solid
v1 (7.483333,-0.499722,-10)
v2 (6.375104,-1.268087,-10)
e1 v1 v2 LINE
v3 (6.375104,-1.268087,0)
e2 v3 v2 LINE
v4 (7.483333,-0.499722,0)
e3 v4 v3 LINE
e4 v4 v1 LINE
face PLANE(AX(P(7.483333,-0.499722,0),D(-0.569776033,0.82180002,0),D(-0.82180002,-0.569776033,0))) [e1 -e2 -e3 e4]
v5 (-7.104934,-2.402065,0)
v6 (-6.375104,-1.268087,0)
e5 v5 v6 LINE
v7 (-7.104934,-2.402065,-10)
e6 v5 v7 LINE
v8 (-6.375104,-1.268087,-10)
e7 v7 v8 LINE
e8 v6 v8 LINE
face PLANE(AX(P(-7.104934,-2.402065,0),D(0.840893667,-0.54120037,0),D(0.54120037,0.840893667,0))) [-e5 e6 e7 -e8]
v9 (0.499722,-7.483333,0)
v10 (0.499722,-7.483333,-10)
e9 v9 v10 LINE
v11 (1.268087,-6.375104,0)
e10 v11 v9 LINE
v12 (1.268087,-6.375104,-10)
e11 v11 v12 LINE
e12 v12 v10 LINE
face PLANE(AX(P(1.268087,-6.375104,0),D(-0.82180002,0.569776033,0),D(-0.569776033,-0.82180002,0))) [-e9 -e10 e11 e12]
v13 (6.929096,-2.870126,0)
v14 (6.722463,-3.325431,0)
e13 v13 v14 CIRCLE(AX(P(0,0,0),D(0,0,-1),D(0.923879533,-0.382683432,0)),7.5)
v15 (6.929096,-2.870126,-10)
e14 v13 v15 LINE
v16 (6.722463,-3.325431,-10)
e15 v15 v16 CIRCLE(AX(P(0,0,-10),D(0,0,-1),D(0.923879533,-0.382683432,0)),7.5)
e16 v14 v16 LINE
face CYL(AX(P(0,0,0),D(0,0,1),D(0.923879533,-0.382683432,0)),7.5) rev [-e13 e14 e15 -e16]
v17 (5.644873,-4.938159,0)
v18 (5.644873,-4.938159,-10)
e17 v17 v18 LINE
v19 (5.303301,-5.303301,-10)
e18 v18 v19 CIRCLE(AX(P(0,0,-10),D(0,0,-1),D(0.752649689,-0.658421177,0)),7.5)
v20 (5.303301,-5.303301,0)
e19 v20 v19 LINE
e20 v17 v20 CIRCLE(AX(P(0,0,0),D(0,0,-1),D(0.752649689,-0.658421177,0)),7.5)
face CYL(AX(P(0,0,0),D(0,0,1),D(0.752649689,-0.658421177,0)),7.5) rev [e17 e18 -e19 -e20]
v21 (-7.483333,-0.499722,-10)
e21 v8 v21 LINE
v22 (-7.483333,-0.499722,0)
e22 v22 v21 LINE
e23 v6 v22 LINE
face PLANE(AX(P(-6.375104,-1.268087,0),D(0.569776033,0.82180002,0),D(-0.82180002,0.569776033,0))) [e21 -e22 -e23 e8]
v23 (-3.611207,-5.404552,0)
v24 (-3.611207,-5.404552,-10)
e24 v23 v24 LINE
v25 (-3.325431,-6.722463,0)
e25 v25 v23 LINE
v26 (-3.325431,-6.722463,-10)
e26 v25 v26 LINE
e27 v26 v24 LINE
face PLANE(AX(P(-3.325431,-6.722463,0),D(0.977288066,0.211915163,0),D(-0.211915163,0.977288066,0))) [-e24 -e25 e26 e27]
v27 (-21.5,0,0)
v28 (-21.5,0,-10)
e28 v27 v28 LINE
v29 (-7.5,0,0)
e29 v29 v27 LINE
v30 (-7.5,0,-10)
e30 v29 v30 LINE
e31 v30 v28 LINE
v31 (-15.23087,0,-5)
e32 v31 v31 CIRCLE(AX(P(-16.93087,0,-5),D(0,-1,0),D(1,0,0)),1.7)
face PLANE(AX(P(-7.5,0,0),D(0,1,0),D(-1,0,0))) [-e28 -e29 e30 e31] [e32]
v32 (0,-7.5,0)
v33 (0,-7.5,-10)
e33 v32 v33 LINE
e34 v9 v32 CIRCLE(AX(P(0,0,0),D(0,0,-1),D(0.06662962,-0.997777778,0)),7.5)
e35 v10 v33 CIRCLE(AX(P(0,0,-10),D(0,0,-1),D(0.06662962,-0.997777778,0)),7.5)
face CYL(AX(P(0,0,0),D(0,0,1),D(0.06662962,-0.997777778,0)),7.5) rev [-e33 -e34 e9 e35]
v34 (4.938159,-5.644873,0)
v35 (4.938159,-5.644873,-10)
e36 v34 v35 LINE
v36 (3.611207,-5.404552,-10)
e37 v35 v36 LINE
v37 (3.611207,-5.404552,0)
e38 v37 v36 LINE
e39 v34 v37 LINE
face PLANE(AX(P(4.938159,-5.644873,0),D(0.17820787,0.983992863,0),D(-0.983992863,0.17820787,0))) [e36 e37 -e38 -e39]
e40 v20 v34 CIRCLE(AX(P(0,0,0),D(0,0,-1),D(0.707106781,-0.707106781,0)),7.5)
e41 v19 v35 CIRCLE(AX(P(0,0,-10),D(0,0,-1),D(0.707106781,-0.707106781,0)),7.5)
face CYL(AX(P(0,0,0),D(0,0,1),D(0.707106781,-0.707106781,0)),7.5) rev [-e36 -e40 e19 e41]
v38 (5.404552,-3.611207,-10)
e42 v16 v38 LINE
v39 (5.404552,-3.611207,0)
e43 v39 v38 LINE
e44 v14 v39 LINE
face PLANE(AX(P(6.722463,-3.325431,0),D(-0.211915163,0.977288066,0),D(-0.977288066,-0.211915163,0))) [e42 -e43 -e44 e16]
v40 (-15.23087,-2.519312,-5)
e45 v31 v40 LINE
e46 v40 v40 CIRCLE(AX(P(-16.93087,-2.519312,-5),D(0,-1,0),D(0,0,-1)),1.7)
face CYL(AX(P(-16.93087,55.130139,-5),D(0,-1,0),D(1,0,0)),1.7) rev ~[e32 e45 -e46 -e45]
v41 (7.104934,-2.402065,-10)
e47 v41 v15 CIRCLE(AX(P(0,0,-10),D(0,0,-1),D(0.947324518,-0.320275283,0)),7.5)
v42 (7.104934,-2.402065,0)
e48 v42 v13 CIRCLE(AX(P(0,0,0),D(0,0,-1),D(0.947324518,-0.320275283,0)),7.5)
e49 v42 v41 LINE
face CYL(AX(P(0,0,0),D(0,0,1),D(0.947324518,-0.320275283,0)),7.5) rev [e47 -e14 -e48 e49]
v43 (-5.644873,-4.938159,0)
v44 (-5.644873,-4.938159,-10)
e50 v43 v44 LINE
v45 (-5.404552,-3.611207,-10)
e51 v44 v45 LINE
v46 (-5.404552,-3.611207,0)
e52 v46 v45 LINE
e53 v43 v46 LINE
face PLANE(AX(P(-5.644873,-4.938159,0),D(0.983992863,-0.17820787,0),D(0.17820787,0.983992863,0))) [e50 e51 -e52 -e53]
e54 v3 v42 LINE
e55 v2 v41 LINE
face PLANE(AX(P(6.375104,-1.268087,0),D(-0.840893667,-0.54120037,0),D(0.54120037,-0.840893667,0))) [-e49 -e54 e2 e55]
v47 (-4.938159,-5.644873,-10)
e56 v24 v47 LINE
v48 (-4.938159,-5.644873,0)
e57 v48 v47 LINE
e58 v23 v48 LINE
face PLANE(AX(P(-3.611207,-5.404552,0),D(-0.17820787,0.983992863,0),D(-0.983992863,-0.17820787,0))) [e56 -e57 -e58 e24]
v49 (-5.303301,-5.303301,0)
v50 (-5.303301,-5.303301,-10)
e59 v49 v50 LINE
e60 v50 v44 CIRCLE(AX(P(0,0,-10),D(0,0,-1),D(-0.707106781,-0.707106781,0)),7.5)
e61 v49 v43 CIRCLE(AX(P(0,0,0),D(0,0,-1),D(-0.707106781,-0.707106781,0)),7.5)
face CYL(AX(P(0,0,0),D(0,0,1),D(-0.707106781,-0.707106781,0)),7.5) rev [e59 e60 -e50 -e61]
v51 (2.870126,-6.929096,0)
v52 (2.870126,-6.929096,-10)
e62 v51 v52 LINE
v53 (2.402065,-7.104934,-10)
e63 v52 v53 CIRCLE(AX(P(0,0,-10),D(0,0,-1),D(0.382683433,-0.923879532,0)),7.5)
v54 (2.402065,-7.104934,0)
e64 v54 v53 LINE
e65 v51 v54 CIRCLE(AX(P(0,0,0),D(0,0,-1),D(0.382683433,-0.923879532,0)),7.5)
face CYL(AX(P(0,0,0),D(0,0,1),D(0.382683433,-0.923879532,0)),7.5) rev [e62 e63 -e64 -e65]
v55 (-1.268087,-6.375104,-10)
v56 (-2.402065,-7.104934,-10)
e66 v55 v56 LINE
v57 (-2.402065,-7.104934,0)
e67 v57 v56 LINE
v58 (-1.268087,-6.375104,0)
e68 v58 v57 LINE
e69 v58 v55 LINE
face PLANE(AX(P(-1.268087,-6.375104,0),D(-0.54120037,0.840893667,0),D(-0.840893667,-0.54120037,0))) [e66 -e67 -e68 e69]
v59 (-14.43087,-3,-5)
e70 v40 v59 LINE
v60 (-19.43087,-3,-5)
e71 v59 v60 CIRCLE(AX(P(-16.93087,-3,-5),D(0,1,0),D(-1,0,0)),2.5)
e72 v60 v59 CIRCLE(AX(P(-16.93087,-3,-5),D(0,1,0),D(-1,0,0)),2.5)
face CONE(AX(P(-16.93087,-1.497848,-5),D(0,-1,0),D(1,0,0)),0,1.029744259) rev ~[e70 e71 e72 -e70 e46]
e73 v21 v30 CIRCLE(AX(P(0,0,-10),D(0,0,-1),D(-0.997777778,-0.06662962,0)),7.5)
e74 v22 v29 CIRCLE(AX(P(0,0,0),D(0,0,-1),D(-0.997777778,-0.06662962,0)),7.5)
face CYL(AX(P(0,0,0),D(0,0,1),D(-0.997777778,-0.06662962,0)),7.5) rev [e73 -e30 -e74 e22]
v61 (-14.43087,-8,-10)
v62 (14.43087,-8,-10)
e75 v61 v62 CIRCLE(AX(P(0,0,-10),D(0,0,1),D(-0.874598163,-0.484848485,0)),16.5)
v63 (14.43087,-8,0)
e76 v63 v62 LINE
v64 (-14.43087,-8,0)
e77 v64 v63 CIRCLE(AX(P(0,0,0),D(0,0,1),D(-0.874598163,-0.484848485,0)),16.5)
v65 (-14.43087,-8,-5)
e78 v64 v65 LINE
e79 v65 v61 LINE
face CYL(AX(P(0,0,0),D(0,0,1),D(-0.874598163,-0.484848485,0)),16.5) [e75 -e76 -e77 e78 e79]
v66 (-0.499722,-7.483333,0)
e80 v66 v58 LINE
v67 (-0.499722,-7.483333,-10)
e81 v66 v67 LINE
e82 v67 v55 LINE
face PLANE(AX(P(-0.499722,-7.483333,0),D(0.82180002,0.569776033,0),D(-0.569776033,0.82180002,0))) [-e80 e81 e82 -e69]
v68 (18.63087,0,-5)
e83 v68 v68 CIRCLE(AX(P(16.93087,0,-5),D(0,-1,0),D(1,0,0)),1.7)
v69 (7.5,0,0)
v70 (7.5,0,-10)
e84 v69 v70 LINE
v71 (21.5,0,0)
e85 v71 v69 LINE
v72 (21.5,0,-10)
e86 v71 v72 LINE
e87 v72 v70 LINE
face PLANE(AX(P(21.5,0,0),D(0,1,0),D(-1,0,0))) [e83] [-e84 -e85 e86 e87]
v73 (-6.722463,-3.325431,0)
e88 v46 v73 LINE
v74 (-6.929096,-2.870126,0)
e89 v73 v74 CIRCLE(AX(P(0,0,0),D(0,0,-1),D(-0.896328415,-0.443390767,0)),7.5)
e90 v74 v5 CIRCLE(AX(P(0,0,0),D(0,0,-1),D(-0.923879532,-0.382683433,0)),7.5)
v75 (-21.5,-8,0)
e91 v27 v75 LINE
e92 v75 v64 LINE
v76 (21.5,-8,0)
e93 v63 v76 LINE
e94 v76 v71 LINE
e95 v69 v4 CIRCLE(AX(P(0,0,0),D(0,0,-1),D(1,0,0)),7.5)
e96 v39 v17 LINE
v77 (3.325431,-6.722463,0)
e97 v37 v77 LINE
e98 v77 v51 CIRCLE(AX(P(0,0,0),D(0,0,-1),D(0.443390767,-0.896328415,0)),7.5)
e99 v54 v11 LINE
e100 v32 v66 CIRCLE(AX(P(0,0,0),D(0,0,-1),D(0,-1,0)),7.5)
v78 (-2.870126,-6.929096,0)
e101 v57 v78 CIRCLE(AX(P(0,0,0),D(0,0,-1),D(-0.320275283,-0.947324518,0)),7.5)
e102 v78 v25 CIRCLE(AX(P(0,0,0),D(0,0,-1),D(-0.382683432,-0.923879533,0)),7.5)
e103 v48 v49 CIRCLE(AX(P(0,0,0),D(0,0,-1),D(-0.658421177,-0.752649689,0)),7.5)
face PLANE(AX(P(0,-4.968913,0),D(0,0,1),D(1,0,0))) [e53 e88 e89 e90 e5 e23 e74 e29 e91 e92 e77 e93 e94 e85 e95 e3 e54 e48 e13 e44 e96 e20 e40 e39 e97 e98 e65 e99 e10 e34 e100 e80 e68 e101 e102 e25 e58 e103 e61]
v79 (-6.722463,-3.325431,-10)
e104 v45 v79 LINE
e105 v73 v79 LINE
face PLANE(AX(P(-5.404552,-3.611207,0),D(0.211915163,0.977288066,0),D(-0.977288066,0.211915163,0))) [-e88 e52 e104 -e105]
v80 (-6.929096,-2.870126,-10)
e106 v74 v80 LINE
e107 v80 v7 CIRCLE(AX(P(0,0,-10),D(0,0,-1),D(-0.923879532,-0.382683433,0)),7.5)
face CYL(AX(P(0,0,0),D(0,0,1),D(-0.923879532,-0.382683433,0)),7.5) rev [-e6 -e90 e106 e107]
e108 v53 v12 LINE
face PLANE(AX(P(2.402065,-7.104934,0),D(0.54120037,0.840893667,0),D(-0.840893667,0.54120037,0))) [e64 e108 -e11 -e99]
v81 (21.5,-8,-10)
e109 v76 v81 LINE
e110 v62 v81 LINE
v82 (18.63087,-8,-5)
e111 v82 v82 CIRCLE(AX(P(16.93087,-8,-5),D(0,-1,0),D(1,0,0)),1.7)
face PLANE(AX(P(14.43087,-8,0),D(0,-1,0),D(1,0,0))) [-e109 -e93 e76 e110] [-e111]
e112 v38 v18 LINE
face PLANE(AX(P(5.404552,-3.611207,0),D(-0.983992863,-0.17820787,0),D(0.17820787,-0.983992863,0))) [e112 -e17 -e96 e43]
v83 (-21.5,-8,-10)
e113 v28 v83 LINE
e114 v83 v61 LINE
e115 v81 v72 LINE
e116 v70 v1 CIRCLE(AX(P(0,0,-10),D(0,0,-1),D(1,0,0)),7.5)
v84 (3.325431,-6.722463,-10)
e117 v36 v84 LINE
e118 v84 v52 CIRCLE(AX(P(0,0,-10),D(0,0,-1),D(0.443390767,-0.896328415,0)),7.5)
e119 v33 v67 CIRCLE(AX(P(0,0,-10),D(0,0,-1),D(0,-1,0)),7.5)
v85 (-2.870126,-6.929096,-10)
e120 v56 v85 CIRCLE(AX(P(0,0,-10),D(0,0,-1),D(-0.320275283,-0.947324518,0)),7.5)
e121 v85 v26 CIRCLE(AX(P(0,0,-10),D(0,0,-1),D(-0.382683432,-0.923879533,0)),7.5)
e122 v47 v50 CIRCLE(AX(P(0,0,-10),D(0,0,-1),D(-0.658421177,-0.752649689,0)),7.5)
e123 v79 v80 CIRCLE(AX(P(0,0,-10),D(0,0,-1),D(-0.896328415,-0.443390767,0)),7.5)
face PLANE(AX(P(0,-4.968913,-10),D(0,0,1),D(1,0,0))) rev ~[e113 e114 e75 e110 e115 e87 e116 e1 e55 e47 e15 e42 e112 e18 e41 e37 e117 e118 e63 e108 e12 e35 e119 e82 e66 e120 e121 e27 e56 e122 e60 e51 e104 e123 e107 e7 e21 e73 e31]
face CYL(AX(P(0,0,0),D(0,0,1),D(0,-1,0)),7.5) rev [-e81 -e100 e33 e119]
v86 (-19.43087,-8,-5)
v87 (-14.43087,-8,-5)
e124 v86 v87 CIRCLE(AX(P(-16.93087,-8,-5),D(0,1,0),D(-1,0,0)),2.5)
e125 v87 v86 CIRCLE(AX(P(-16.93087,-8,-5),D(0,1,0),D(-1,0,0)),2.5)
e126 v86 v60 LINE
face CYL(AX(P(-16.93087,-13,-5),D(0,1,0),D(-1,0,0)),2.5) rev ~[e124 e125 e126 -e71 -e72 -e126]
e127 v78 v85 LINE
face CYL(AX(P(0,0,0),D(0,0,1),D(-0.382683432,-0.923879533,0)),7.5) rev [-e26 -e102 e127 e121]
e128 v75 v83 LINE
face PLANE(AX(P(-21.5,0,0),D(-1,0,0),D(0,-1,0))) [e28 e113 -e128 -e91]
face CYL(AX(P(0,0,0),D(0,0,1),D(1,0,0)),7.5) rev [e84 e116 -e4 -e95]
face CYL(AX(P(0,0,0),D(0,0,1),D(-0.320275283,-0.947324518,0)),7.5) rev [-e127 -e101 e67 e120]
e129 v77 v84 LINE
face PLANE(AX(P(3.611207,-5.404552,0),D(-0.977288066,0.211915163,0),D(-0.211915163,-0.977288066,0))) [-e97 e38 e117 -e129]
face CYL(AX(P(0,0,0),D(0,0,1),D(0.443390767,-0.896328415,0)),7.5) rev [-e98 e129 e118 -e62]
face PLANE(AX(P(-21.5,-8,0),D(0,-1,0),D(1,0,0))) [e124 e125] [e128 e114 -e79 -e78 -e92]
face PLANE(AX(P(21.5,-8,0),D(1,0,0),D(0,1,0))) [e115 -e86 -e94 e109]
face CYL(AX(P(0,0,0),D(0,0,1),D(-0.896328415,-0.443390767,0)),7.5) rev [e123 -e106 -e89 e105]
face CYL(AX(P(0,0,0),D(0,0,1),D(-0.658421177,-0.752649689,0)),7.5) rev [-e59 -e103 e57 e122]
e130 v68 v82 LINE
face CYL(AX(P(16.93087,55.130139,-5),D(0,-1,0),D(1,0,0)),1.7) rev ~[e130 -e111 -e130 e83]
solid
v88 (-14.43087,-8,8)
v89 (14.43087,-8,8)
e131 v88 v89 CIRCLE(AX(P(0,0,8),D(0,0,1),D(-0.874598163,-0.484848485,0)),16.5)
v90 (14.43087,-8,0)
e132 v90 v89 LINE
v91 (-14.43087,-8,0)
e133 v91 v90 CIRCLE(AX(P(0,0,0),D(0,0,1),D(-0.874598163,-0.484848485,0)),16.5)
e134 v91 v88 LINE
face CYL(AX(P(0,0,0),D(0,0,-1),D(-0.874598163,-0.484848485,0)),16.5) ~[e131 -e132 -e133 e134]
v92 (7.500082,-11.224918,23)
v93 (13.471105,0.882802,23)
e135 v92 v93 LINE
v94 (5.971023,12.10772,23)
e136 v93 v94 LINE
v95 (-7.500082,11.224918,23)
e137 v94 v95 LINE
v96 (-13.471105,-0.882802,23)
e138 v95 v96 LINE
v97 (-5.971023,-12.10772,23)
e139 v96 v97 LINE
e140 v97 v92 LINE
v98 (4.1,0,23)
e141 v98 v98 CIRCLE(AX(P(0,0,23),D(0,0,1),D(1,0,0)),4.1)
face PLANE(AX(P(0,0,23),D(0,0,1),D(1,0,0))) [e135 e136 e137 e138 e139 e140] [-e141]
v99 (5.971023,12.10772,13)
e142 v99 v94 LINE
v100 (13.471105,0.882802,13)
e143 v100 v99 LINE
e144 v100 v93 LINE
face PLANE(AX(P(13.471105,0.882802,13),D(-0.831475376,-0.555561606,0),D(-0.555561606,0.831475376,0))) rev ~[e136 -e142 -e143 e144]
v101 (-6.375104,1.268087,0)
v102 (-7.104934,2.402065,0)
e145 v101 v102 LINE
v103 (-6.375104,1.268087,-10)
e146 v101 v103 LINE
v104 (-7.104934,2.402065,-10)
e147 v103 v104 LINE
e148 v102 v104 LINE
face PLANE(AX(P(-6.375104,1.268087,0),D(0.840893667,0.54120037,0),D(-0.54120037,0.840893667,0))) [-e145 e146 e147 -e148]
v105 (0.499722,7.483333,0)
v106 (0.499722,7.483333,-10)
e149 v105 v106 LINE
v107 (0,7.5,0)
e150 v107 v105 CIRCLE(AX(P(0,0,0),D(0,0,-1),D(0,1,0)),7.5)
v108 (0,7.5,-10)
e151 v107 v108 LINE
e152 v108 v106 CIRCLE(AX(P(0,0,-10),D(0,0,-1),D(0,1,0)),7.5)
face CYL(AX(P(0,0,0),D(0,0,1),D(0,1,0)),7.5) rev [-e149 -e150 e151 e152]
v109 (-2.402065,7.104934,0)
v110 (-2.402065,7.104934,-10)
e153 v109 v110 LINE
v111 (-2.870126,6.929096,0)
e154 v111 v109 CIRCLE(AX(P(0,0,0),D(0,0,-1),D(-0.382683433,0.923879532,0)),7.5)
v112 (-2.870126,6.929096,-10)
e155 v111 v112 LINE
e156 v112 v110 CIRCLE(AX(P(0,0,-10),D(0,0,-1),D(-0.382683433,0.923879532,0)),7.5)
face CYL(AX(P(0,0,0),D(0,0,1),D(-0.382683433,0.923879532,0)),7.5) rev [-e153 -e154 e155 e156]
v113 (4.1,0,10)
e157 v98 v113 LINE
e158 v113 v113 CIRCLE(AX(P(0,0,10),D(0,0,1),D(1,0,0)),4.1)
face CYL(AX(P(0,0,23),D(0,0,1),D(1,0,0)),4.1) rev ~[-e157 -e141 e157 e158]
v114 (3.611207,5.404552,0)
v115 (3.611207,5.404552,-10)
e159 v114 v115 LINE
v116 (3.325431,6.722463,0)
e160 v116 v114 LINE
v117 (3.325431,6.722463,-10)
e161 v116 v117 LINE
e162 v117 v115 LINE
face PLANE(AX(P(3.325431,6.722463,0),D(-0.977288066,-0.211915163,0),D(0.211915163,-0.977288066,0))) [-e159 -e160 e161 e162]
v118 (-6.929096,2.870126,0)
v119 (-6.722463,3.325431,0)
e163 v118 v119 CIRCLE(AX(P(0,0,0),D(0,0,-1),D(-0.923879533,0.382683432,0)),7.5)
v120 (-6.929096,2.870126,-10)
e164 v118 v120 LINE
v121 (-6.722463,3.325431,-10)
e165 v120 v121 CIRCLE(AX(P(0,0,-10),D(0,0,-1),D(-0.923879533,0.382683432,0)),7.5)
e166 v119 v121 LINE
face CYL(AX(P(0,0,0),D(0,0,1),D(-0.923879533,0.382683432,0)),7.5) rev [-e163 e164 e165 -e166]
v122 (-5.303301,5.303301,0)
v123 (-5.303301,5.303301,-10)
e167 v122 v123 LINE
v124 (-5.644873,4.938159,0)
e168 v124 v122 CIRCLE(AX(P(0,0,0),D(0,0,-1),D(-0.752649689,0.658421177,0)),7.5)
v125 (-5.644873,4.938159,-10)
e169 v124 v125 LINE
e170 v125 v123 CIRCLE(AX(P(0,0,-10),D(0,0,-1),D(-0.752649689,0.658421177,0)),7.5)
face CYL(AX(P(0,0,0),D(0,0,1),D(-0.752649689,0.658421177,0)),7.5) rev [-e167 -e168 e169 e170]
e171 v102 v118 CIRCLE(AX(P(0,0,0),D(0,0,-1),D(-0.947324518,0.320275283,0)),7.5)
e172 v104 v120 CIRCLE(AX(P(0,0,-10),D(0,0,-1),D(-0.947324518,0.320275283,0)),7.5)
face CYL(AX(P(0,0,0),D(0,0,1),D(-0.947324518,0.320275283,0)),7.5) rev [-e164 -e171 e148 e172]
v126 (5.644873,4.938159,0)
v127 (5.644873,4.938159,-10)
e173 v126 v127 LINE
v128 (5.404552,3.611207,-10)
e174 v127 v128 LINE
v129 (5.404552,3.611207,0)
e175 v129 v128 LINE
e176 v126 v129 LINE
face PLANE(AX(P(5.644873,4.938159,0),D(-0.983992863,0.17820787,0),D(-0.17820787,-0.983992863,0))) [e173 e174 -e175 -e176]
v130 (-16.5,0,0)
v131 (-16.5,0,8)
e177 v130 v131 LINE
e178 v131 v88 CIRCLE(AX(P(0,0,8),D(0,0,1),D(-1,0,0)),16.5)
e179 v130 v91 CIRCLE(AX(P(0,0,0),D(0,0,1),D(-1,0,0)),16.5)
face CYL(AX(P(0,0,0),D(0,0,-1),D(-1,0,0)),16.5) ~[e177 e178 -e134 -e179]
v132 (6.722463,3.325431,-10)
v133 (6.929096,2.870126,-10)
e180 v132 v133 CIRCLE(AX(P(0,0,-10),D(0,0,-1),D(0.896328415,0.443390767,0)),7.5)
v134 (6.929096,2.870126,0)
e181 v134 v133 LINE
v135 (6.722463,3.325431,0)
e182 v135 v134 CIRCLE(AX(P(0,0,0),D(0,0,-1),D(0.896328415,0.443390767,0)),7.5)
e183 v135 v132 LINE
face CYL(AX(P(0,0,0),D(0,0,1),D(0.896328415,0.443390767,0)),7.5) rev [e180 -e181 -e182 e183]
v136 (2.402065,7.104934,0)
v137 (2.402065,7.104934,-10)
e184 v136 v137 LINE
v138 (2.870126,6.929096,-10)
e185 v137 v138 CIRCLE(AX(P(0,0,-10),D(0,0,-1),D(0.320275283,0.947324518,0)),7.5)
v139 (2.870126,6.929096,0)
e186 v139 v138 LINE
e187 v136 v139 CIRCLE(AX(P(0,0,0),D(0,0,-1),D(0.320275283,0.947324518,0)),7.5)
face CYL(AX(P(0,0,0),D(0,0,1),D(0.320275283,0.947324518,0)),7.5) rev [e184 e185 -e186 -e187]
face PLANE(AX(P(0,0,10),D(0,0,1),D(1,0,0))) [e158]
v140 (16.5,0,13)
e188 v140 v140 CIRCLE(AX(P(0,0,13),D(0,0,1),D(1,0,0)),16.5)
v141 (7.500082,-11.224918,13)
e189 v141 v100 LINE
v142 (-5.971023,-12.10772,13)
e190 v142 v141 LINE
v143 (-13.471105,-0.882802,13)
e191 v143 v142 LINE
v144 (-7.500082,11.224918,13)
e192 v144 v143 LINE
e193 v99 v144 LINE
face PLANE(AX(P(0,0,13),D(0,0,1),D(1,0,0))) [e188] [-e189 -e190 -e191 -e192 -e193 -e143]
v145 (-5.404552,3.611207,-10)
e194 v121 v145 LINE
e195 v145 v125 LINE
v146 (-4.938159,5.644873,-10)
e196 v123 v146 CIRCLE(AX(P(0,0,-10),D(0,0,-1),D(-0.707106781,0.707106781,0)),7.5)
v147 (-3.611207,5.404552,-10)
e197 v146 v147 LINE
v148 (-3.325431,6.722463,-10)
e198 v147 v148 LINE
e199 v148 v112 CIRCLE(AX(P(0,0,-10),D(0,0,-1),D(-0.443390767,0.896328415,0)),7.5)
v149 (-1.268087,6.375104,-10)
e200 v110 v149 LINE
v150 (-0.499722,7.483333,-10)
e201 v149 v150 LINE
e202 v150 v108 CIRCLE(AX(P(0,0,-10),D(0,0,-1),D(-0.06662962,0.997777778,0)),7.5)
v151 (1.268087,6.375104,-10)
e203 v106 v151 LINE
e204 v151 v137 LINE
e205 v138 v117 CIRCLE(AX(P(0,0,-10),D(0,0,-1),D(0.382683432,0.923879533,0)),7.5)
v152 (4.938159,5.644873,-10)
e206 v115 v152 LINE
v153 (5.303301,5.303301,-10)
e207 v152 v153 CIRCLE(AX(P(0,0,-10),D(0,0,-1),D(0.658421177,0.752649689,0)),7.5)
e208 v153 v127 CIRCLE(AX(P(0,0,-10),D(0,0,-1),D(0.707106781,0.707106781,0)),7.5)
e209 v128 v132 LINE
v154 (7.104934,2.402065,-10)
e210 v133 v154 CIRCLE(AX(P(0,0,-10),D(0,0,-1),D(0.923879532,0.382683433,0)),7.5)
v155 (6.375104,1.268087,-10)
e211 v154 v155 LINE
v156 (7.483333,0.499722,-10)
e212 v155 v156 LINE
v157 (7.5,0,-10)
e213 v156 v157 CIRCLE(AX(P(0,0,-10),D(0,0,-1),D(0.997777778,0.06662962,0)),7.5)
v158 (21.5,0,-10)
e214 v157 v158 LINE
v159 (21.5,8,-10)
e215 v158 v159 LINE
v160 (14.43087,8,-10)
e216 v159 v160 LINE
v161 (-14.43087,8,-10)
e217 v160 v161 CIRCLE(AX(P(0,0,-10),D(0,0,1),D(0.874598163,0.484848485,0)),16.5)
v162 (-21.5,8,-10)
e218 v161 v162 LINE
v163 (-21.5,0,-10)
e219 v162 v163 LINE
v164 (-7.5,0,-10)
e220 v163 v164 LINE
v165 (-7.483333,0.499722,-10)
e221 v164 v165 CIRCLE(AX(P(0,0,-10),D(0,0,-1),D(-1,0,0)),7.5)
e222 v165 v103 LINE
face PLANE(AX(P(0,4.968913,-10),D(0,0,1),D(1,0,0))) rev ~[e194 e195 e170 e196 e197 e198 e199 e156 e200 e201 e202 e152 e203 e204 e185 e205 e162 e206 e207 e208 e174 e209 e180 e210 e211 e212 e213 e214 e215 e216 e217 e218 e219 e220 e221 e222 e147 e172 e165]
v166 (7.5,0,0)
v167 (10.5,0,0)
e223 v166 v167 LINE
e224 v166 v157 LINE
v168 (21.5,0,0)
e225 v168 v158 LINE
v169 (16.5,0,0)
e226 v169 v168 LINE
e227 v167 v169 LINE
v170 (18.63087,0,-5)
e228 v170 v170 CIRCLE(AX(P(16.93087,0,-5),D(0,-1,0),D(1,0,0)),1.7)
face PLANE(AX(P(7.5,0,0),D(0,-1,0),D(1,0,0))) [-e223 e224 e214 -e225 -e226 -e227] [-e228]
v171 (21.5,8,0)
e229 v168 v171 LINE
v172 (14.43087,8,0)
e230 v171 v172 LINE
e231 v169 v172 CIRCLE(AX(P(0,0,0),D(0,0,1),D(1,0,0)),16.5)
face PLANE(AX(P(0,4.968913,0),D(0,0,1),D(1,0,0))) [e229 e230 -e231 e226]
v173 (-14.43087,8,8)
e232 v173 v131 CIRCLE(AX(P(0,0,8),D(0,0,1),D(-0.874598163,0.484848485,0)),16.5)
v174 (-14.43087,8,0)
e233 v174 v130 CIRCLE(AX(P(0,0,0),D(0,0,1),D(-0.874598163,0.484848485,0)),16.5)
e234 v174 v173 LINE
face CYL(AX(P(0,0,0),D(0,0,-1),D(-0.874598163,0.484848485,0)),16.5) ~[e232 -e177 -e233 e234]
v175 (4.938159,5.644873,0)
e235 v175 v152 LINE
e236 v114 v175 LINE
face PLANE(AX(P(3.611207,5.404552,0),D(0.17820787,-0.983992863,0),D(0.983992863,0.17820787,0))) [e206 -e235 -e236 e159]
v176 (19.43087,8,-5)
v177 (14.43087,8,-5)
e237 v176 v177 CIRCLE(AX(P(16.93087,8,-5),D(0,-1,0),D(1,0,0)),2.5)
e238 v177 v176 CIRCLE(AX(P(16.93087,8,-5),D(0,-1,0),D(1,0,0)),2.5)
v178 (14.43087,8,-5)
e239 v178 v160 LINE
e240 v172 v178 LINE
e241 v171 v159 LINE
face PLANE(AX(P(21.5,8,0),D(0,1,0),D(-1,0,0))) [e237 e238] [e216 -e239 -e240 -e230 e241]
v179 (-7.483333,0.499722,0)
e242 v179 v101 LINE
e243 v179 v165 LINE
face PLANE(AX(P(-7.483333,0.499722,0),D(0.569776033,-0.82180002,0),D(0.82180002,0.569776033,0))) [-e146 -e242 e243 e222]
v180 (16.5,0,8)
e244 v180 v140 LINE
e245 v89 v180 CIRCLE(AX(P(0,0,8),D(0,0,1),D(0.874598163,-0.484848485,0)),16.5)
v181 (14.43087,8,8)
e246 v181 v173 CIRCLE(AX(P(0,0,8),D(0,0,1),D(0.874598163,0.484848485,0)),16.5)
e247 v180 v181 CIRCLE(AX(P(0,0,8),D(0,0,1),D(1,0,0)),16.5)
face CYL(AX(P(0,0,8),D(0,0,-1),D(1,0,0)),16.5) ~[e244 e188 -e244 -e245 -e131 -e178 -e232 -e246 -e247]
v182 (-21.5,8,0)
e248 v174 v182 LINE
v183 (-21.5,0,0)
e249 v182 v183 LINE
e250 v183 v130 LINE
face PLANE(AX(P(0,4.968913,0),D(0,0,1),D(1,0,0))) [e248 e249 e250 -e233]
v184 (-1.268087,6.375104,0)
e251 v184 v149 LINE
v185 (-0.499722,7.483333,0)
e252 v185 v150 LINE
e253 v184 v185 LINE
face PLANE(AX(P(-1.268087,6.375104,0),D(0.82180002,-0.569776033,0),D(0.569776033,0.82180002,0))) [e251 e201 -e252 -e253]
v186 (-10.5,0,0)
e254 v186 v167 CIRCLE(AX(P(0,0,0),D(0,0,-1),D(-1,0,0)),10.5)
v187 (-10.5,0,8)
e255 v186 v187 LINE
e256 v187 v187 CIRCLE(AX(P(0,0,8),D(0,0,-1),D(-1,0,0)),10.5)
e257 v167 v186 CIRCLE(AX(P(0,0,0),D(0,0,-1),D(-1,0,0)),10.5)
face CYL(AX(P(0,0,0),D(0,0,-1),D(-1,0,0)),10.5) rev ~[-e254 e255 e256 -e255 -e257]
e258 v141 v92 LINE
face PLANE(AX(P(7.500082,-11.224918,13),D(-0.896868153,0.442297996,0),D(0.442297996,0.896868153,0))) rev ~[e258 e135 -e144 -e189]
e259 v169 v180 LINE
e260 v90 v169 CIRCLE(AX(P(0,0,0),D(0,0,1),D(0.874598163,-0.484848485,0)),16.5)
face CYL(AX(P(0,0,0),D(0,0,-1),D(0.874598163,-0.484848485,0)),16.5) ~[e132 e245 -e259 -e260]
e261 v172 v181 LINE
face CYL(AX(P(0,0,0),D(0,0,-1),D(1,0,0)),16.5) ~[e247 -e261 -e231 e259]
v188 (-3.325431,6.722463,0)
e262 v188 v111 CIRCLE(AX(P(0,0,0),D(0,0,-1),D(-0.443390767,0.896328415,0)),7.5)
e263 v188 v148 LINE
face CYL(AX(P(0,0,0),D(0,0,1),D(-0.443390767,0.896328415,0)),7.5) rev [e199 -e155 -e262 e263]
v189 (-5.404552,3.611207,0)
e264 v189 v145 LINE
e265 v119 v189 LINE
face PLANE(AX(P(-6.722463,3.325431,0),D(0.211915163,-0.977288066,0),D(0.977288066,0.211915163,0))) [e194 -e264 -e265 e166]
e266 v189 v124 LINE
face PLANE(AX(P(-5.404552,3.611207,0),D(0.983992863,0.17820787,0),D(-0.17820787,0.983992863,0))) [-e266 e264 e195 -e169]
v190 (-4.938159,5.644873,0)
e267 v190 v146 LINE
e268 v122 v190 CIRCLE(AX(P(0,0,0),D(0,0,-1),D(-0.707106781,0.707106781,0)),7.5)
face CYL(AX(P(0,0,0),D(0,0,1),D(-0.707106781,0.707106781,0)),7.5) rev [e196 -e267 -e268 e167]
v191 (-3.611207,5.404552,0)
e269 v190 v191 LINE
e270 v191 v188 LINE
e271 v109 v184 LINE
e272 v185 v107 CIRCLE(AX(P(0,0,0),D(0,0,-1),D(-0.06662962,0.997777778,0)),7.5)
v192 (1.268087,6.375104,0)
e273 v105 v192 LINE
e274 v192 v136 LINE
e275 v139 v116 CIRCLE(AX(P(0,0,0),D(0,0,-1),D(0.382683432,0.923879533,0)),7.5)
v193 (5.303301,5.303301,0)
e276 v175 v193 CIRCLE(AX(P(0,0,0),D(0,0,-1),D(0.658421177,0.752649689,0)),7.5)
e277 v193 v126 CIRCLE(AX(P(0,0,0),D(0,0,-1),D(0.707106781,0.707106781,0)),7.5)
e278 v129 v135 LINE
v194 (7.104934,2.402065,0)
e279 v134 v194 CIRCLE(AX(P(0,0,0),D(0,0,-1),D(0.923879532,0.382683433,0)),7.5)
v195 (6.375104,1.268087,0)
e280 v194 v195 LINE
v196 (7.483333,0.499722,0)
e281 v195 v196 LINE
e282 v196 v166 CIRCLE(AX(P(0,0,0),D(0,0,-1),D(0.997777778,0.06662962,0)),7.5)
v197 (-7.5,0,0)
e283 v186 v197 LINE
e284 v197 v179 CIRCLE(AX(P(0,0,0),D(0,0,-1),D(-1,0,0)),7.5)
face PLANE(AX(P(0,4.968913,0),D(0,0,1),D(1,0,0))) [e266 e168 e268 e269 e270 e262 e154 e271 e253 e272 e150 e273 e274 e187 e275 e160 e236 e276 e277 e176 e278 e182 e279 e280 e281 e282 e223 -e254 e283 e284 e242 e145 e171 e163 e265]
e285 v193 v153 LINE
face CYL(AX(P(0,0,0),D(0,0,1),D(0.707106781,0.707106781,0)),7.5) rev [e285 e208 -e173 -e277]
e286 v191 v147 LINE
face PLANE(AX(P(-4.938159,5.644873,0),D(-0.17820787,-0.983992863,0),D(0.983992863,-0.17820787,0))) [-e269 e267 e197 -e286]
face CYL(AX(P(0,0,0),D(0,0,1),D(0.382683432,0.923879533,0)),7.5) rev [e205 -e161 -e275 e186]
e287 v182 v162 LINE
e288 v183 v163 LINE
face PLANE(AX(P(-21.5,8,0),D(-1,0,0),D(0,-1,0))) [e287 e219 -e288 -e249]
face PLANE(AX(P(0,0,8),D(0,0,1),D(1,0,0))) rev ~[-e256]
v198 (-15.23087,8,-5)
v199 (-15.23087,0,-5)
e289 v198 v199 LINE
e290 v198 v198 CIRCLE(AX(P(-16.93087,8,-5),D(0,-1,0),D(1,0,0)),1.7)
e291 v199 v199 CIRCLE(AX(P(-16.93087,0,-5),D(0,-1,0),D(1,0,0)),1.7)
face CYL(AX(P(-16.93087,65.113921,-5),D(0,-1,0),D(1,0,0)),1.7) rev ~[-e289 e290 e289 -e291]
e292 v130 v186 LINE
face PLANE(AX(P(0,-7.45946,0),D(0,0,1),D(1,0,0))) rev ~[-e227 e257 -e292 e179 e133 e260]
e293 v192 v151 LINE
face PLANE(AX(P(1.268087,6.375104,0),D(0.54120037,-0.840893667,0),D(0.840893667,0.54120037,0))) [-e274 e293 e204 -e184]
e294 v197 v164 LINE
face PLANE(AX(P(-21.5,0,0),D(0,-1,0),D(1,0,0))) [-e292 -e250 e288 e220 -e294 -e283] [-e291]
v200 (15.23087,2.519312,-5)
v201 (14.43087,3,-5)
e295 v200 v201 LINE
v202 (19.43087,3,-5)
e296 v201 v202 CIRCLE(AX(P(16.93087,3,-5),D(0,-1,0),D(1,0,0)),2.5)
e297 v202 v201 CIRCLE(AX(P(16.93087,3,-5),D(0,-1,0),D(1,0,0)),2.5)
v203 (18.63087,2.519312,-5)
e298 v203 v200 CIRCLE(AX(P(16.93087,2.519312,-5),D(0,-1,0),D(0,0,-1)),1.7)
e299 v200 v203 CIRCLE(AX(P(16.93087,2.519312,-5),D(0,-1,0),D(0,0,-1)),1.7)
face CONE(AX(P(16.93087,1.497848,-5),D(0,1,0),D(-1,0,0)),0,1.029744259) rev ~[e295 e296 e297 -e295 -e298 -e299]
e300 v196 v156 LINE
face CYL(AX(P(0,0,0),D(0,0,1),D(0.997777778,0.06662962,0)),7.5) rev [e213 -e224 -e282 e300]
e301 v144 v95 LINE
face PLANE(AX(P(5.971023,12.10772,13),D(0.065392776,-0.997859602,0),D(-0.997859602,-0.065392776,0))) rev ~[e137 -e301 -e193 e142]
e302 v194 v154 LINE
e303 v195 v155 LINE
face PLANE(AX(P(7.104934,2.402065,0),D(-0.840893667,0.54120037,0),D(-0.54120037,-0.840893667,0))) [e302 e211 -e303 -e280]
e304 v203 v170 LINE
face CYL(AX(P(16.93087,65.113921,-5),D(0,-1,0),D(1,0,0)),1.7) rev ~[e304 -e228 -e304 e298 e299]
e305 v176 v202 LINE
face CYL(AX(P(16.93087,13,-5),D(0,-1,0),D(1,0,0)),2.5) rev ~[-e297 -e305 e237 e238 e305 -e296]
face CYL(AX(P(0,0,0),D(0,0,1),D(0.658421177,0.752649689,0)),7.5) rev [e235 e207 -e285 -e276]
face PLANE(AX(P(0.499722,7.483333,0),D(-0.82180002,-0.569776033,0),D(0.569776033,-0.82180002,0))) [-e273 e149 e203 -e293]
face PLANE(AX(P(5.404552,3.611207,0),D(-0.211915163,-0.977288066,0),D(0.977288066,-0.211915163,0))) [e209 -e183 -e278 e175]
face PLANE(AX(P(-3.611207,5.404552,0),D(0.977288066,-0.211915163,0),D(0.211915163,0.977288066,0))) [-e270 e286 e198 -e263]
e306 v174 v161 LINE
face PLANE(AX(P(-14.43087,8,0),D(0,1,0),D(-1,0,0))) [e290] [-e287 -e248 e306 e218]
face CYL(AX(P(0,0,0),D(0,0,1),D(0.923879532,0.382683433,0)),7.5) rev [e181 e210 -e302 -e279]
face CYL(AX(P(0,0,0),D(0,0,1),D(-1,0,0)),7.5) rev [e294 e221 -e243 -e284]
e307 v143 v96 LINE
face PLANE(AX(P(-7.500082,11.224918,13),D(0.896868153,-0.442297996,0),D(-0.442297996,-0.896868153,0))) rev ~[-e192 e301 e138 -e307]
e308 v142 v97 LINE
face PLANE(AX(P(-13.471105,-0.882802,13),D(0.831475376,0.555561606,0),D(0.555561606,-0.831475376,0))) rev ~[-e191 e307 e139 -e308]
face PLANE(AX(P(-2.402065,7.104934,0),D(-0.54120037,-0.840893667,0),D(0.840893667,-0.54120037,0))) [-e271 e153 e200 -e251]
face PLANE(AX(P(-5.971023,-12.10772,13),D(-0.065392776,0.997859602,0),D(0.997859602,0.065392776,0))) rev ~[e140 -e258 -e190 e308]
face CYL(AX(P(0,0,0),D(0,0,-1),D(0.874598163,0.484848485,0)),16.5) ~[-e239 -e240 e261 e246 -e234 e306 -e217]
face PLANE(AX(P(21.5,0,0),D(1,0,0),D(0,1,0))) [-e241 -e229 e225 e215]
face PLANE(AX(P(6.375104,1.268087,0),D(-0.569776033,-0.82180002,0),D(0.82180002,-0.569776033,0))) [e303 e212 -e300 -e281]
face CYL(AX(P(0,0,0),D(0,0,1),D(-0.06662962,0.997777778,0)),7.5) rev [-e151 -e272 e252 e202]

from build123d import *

# Parameters (mm, degrees)
F1_DEPTH       = 10
F2_DEPTH       = 10
F3_DEPTH       = 8
F5_D           = 3.4
F5_2_D         = 3.4
F7_D           = 5
F7_DEPTH       = 5
F7_TIP         = 1.5021515476
F7_ON_F6_D     = 5
F7_ON_F6_DEPTH = 5
F7_ON_F6_TIP   = 1.5021515476
F8_R           = 16.5
F8_R_2         = 10.5
F9_DEPTH       = 5
F11_DEPTH      = 10
F12_R          = 4.1
F13_DEPTH      = 13


# Not quite as in the source:
# - a feature names something its author has since deleted; it is built from what else it names


with BuildPart() as f1:
    # F0 (on Top) → F1 (new body)
    with BuildSketch(Plane.XY):
        with BuildLine():
            ThreePointArc((7.4833333333, 0.499722145), (7.4958321753, 0.25), (7.5, 0))
            Line((7.5, 0), (10.5, 0))
            ThreePointArc((10.5, 0), (0, 10.5), (-10.5, 0))
            Line((-10.5, 0), (-7.5, 0))
            ThreePointArc((-7.5, 0), (-7.4958321753, 0.25), (-7.4833333333, 0.499722145))
            ThreePointArc((-7.4833333333, 0.499722145), (-7.355889603, 1.4631774151), (-7.1049338873, 2.4020646238))
            ThreePointArc((-7.1049338873, 2.4020646238), (-7.020916784, 2.6375609021), (-6.9290964938, 2.8701257427))
            ThreePointArc((-6.9290964938, 2.8701257427), (-6.8295750678, 3.0995006684), (-6.7224631159, 3.3254307473))
            ThreePointArc((-6.7224631159, 3.3254307473), (-6.2360220923, 4.1667767476), (-5.6448726633, 4.9381588284))
            ThreePointArc((-5.6448726633, 4.9381588284), (-5.4771304571, 5.1235770665), (-5.3033008589, 5.3033008589))
            ThreePointArc((-5.3033008589, 5.3033008589), (-5.1235770665, 5.4771304571), (-4.9381588284, 5.6448726633))
            ThreePointArc((-4.9381588284, 5.6448726633), (-4.1667767476, 6.2360220923), (-3.3254307473, 6.7224631159))
            ThreePointArc((-3.3254307473, 6.7224631159), (-3.0995006684, 6.8295750678), (-2.8701257427, 6.9290964938))
            ThreePointArc((-2.8701257427, 6.9290964938), (-2.6375609021, 7.020916784), (-2.4020646238, 7.1049338873))
            ThreePointArc((-2.4020646238, 7.1049338873), (-1.4631774151, 7.355889603), (-0.499722145, 7.4833333333))
            ThreePointArc((-0.499722145, 7.4833333333), (-0.25, 7.4958321753), (0, 7.5))
            ThreePointArc((0, 7.5), (0.25, 7.4958321753), (0.499722145, 7.4833333333))
            ThreePointArc((0.499722145, 7.4833333333), (1.4631774151, 7.355889603), (2.4020646238, 7.1049338873))
            ThreePointArc((2.4020646238, 7.1049338873), (2.6375609021, 7.020916784), (2.8701257427, 6.9290964938))
            ThreePointArc((2.8701257427, 6.9290964938), (3.0995006684, 6.8295750678), (3.3254307473, 6.7224631159))
            ThreePointArc((3.3254307473, 6.7224631159), (4.1667767476, 6.2360220923), (4.9381588284, 5.6448726633))
            ThreePointArc((4.9381588284, 5.6448726633), (5.1235770665, 5.4771304571), (5.3033008589, 5.3033008589))
            ThreePointArc((5.3033008589, 5.3033008589), (5.4771304571, 5.1235770665), (5.6448726633, 4.9381588284))
            ThreePointArc((5.6448726633, 4.9381588284), (6.2360220923, 4.1667767476), (6.7224631159, 3.3254307473))
            ThreePointArc((6.7224631159, 3.3254307473), (6.8295750678, 3.0995006684), (6.9290964938, 2.8701257427))
            ThreePointArc((6.9290964938, 2.8701257427), (7.020916784, 2.6375609021), (7.1049338873, 2.4020646238))
            ThreePointArc((7.1049338873, 2.4020646238), (7.355889603, 1.4631774151), (7.4833333333, 0.499722145))
        make_face()
        with BuildLine():
            ThreePointArc((-10.5, 0), (0, 10.5), (10.5, 0))
            Line((10.5, 0), (16.5, 0))
            ThreePointArc((16.5, 0), (15.9743442726, 4.1316249903), (14.4308696897, 8))
            ThreePointArc((14.4308696897, 8), (0, 16.5), (-14.4308696897, 8))
            ThreePointArc((-14.4308696897, 8), (-15.9743442726, 4.1316249903), (-16.5, 0))
            Line((-16.5, 0), (-10.5, 0))
        make_face()
        with BuildLine():
            ThreePointArc((14.4308696897, 8), (15.9743442726, 4.1316249903), (16.5, 0))
            Line((16.5, 0), (21.5, 0))
            Line((21.5, 0), (21.5, 8))
            Line((21.5, 8), (14.4308696897, 8))
        make_face()
        with BuildLine():
            Line((-21.5, 0), (-16.5, 0))
            ThreePointArc((-16.5, 0), (-15.9743442726, 4.1316249903), (-14.4308696897, 8))
            Line((-14.4308696897, 8), (-21.5, 8))
            Line((-21.5, 8), (-21.5, 0))
        make_face()
        with BuildLine():
            ThreePointArc((-7.1049338873, 2.4020646238), (-7.355889603, 1.4631774151), (-7.4833333333, 0.499722145))
            Line((-7.4833333333, 0.499722145), (-6.3751043226, 1.2680870931))
            Line((-6.3751043226, 1.2680870931), (-7.1049338873, 2.4020646238))
        make_face()
        with BuildLine():
            ThreePointArc((-5.6448726633, 4.9381588284), (-6.2360220923, 4.1667767476), (-6.7224631159, 3.3254307473))
            Line((-6.7224631159, 3.3254307473), (-5.40455248, 3.6112065146))
            Line((-5.40455248, 3.6112065146), (-5.6448726633, 4.9381588284))
        make_face()
        with BuildLine():
            ThreePointArc((-3.3254307473, 6.7224631159), (-4.1667767476, 6.2360220923), (-4.9381588284, 5.6448726633))
            Line((-4.9381588284, 5.6448726633), (-3.6112065146, 5.40455248))
            Line((-3.6112065146, 5.40455248), (-3.3254307473, 6.7224631159))
        make_face()
        with BuildLine():
            Line((-1.2680870931, 6.3751043226), (-0.499722145, 7.4833333333))
            ThreePointArc((-0.499722145, 7.4833333333), (-1.4631774151, 7.355889603), (-2.4020646238, 7.1049338873))
            Line((-2.4020646238, 7.1049338873), (-1.2680870931, 6.3751043226))
        make_face()
        with BuildLine():
            Line((1.2680870931, 6.3751043226), (2.4020646238, 7.1049338873))
            ThreePointArc((2.4020646238, 7.1049338873), (1.4631774151, 7.355889603), (0.499722145, 7.4833333333))
            Line((0.499722145, 7.4833333333), (1.2680870931, 6.3751043226))
        make_face()
        with BuildLine():
            Line((3.6112065146, 5.40455248), (4.9381588284, 5.6448726633))
            ThreePointArc((4.9381588284, 5.6448726633), (4.1667767476, 6.2360220923), (3.3254307473, 6.7224631159))
            Line((3.3254307473, 6.7224631159), (3.6112065146, 5.40455248))
        make_face()
        with BuildLine():
            Line((5.40455248, 3.6112065146), (6.7224631159, 3.3254307473))
            ThreePointArc((6.7224631159, 3.3254307473), (6.2360220923, 4.1667767476), (5.6448726633, 4.9381588284))
            Line((5.6448726633, 4.9381588284), (5.40455248, 3.6112065146))
        make_face()
        with BuildLine():
            Line((6.3751043226, 1.2680870931), (7.4833333333, 0.499722145))
            ThreePointArc((7.4833333333, 0.499722145), (7.355889603, 1.4631774151), (7.1049338873, 2.4020646238))
            Line((7.1049338873, 2.4020646238), (6.3751043226, 1.2680870931))
        make_face()
    extrude(amount=-F1_DEPTH)

    # F0 (on Top) → F3 (join)
    with BuildSketch(Plane.XY):
        with BuildLine():
            Line((16.5, 0), (10.5, 0))
            ThreePointArc((10.5, 0), (0, -10.5), (-10.5, 0))
            Line((-10.5, 0), (-16.5, 0))
            ThreePointArc((-16.5, 0), (-15.9743442726, -4.1316249903), (-14.4308696897, -8))
            ThreePointArc((-14.4308696897, -8), (0, -16.5), (14.4308696897, -8))
            ThreePointArc((14.4308696897, -8), (15.9743442726, -4.1316249903), (16.5, 0))
        make_face()
        with BuildLine():
            ThreePointArc((-10.5, 0), (0, 10.5), (10.5, 0))
            Line((10.5, 0), (16.5, 0))
            ThreePointArc((16.5, 0), (15.9743442726, 4.1316249903), (14.4308696897, 8))
            ThreePointArc((14.4308696897, 8), (0, 16.5), (-14.4308696897, 8))
            ThreePointArc((-14.4308696897, 8), (-15.9743442726, 4.1316249903), (-16.5, 0))
            Line((-16.5, 0), (-10.5, 0))
        make_face()
    extrude(amount=F3_DEPTH)

    # F5 (through all)
    with Locations(Plane(origin=(0, 8, 0), x_dir=(-1, 0, 0), z_dir=(0, 1, 0))):
        with Locations((-16.9308696897, -5), (16.9308696897, -5)):
            Hole(F5_D / 2)

    # F7
    with Locations(Plane(origin=(0, 8, 0), x_dir=(-1, 0, 0), z_dir=(0, 1, 0))):
        with Locations((-16.9308696897, -5)):
            Hole(F7_D / 2, depth=F7_DEPTH)
            with Locations((0, 0, -(F7_DEPTH + F7_TIP / 2))):  # 118° drill point
                Cone(0, F7_D / 2, F7_TIP, mode=Mode.SUBTRACT)

    # F8 (on face) → F9 (join)
    with BuildSketch(Plane.XY.offset(8)):
        Circle(F8_R)
        Circle(F8_R_2, mode=Mode.SUBTRACT)
        Circle(F8_R_2)
    extrude(amount=F9_DEPTH)

    # F10 (on face) → F11 (join)
    with BuildSketch(Plane.XY.offset(13)):
        Polygon((-7.5000816839, 11.2249175826), (-13.4711046238, -0.8828024774), (-5.9710229399, -12.10772006), (7.5000816839, -11.2249175826), (13.4711046238, 0.8828024774), (5.9710229399, 12.10772006), align=None)
    extrude(amount=F11_DEPTH)

    # F12 (on face) → F13 (cut, through all)
    with BuildSketch(Plane.XY.offset(23)):
        Circle(F12_R)
    extrude(amount=-F13_DEPTH, mode=Mode.SUBTRACT)


with BuildPart() as f2:
    # F0 (on Top) → F2 (new body, through all)
    with BuildSketch(Plane.XY):
        with BuildLine():
            Line((10.5, 0), (7.5, 0))
            ThreePointArc((7.5, 0), (7.4958321753, -0.25), (7.4833333333, -0.499722145))
            ThreePointArc((7.4833333333, -0.499722145), (7.355889603, -1.4631774151), (7.1049338873, -2.4020646238))
            ThreePointArc((7.1049338873, -2.4020646238), (7.020916784, -2.6375609021), (6.9290964938, -2.8701257427))
            ThreePointArc((6.9290964938, -2.8701257427), (6.8295750678, -3.0995006684), (6.7224631159, -3.3254307473))
            ThreePointArc((6.7224631159, -3.3254307473), (6.2360220923, -4.1667767476), (5.6448726633, -4.9381588284))
            ThreePointArc((5.6448726633, -4.9381588284), (5.4771304571, -5.1235770665), (5.3033008589, -5.3033008589))
            ThreePointArc((5.3033008589, -5.3033008589), (5.1235770665, -5.4771304571), (4.9381588284, -5.6448726633))
            ThreePointArc((4.9381588284, -5.6448726633), (4.1667767476, -6.2360220923), (3.3254307473, -6.7224631159))
            ThreePointArc((3.3254307473, -6.7224631159), (3.0995006684, -6.8295750678), (2.8701257427, -6.9290964938))
            ThreePointArc((2.8701257427, -6.9290964938), (2.6375609021, -7.020916784), (2.4020646238, -7.1049338873))
            ThreePointArc((2.4020646238, -7.1049338873), (1.4631774151, -7.355889603), (0.499722145, -7.4833333333))
            ThreePointArc((0.499722145, -7.4833333333), (0.25, -7.4958321753), (0, -7.5))
            ThreePointArc((0, -7.5), (-0.25, -7.4958321753), (-0.499722145, -7.4833333333))
            ThreePointArc((-0.499722145, -7.4833333333), (-1.4631774151, -7.355889603), (-2.4020646238, -7.1049338873))
            ThreePointArc((-2.4020646238, -7.1049338873), (-2.6375609021, -7.020916784), (-2.8701257427, -6.9290964938))
            ThreePointArc((-2.8701257427, -6.9290964938), (-3.0995006684, -6.8295750678), (-3.3254307473, -6.7224631159))
            ThreePointArc((-3.3254307473, -6.7224631159), (-4.1667767476, -6.2360220923), (-4.9381588284, -5.6448726633))
            ThreePointArc((-4.9381588284, -5.6448726633), (-5.1235770665, -5.4771304571), (-5.3033008589, -5.3033008589))
            ThreePointArc((-5.3033008589, -5.3033008589), (-5.4771304571, -5.1235770665), (-5.6448726633, -4.9381588284))
            ThreePointArc((-5.6448726633, -4.9381588284), (-6.2360220923, -4.1667767476), (-6.7224631159, -3.3254307473))
            ThreePointArc((-6.7224631159, -3.3254307473), (-6.8295750678, -3.0995006684), (-6.9290964938, -2.8701257427))
            ThreePointArc((-6.9290964938, -2.8701257427), (-7.020916784, -2.6375609021), (-7.1049338873, -2.4020646238))
            ThreePointArc((-7.1049338873, -2.4020646238), (-7.355889603, -1.4631774151), (-7.4833333333, -0.499722145))
            ThreePointArc((-7.4833333333, -0.499722145), (-7.4958321753, -0.25), (-7.5, 0))
            Line((-7.5, 0), (-10.5, 0))
            ThreePointArc((-10.5, 0), (0, -10.5), (10.5, 0))
        make_face()
        with BuildLine():
            Line((16.5, 0), (10.5, 0))
            ThreePointArc((10.5, 0), (0, -10.5), (-10.5, 0))
            Line((-10.5, 0), (-16.5, 0))
            ThreePointArc((-16.5, 0), (-15.9743442726, -4.1316249903), (-14.4308696897, -8))
            ThreePointArc((-14.4308696897, -8), (0, -16.5), (14.4308696897, -8))
            ThreePointArc((14.4308696897, -8), (15.9743442726, -4.1316249903), (16.5, 0))
        make_face()
        with BuildLine():
            ThreePointArc((-14.4308696897, -8), (-15.9743442726, -4.1316249903), (-16.5, 0))
            Line((-16.5, 0), (-21.5, 0))
            Line((-21.5, 0), (-21.5, -8))
            Line((-21.5, -8), (-14.4308696897, -8))
        make_face()
        with BuildLine():
            Line((21.5, 0), (16.5, 0))
            ThreePointArc((16.5, 0), (15.9743442726, -4.1316249903), (14.4308696897, -8))
            Line((14.4308696897, -8), (21.5, -8))
            Line((21.5, -8), (21.5, 0))
        make_face()
        with BuildLine():
            Line((-6.3751043226, -1.2680870931), (-7.4833333333, -0.499722145))
            ThreePointArc((-7.4833333333, -0.499722145), (-7.355889603, -1.4631774151), (-7.1049338873, -2.4020646238))
            Line((-7.1049338873, -2.4020646238), (-6.3751043226, -1.2680870931))
        make_face()
        with BuildLine():
            Line((-5.40455248, -3.6112065146), (-6.7224631159, -3.3254307473))
            ThreePointArc((-6.7224631159, -3.3254307473), (-6.2360220923, -4.1667767476), (-5.6448726633, -4.9381588284))
            Line((-5.6448726633, -4.9381588284), (-5.40455248, -3.6112065146))
        make_face()
        with BuildLine():
            Line((-3.6112065146, -5.40455248), (-4.9381588284, -5.6448726633))
            ThreePointArc((-4.9381588284, -5.6448726633), (-4.1667767476, -6.2360220923), (-3.3254307473, -6.7224631159))
            Line((-3.3254307473, -6.7224631159), (-3.6112065146, -5.40455248))
        make_face()
        with BuildLine():
            Line((-1.2680870931, -6.3751043226), (-2.4020646238, -7.1049338873))
            ThreePointArc((-2.4020646238, -7.1049338873), (-1.4631774151, -7.355889603), (-0.499722145, -7.4833333333))
            Line((-0.499722145, -7.4833333333), (-1.2680870931, -6.3751043226))
        make_face()
        with BuildLine():
            ThreePointArc((0.499722145, -7.4833333333), (1.4631774151, -7.355889603), (2.4020646238, -7.1049338873))
            Line((2.4020646238, -7.1049338873), (1.2680870931, -6.3751043226))
            Line((1.2680870931, -6.3751043226), (0.499722145, -7.4833333333))
        make_face()
        with BuildLine():
            ThreePointArc((3.3254307473, -6.7224631159), (4.1667767476, -6.2360220923), (4.9381588284, -5.6448726633))
            Line((4.9381588284, -5.6448726633), (3.6112065146, -5.40455248))
            Line((3.6112065146, -5.40455248), (3.3254307473, -6.7224631159))
        make_face()
        with BuildLine():
            ThreePointArc((5.6448726633, -4.9381588284), (6.2360220923, -4.1667767476), (6.7224631159, -3.3254307473))
            Line((6.7224631159, -3.3254307473), (5.40455248, -3.6112065146))
            Line((5.40455248, -3.6112065146), (5.6448726633, -4.9381588284))
        make_face()
        with BuildLine():
            ThreePointArc((7.1049338873, -2.4020646238), (7.355889603, -1.4631774151), (7.4833333333, -0.499722145))
            Line((7.4833333333, -0.499722145), (6.3751043226, -1.2680870931))
            Line((6.3751043226, -1.2680870931), (7.1049338873, -2.4020646238))
        make_face()
    extrude(amount=-F2_DEPTH)

    # F5#2 (through all)
    with Locations(Plane(origin=(0, 8, 0), x_dir=(-1, 0, 0), z_dir=(0, 1, 0))):
        with Locations((-16.9308696897, -5), (16.9308696897, -5)):
            Hole(F5_2_D / 2)

    # F7 on F6
    with Locations(Plane.XZ.offset(8)):
        with Locations((-16.9308696897, -5)):
            Hole(F7_ON_F6_D / 2, depth=F7_ON_F6_DEPTH)
            with Locations((0, 0, -(F7_ON_F6_DEPTH + F7_ON_F6_TIP / 2))):  # 118° drill point
                Cone(0, F7_ON_F6_D / 2, F7_ON_F6_TIP, mode=Mode.SUBTRACT)


solid = Compound([f1.part, f2.part])
